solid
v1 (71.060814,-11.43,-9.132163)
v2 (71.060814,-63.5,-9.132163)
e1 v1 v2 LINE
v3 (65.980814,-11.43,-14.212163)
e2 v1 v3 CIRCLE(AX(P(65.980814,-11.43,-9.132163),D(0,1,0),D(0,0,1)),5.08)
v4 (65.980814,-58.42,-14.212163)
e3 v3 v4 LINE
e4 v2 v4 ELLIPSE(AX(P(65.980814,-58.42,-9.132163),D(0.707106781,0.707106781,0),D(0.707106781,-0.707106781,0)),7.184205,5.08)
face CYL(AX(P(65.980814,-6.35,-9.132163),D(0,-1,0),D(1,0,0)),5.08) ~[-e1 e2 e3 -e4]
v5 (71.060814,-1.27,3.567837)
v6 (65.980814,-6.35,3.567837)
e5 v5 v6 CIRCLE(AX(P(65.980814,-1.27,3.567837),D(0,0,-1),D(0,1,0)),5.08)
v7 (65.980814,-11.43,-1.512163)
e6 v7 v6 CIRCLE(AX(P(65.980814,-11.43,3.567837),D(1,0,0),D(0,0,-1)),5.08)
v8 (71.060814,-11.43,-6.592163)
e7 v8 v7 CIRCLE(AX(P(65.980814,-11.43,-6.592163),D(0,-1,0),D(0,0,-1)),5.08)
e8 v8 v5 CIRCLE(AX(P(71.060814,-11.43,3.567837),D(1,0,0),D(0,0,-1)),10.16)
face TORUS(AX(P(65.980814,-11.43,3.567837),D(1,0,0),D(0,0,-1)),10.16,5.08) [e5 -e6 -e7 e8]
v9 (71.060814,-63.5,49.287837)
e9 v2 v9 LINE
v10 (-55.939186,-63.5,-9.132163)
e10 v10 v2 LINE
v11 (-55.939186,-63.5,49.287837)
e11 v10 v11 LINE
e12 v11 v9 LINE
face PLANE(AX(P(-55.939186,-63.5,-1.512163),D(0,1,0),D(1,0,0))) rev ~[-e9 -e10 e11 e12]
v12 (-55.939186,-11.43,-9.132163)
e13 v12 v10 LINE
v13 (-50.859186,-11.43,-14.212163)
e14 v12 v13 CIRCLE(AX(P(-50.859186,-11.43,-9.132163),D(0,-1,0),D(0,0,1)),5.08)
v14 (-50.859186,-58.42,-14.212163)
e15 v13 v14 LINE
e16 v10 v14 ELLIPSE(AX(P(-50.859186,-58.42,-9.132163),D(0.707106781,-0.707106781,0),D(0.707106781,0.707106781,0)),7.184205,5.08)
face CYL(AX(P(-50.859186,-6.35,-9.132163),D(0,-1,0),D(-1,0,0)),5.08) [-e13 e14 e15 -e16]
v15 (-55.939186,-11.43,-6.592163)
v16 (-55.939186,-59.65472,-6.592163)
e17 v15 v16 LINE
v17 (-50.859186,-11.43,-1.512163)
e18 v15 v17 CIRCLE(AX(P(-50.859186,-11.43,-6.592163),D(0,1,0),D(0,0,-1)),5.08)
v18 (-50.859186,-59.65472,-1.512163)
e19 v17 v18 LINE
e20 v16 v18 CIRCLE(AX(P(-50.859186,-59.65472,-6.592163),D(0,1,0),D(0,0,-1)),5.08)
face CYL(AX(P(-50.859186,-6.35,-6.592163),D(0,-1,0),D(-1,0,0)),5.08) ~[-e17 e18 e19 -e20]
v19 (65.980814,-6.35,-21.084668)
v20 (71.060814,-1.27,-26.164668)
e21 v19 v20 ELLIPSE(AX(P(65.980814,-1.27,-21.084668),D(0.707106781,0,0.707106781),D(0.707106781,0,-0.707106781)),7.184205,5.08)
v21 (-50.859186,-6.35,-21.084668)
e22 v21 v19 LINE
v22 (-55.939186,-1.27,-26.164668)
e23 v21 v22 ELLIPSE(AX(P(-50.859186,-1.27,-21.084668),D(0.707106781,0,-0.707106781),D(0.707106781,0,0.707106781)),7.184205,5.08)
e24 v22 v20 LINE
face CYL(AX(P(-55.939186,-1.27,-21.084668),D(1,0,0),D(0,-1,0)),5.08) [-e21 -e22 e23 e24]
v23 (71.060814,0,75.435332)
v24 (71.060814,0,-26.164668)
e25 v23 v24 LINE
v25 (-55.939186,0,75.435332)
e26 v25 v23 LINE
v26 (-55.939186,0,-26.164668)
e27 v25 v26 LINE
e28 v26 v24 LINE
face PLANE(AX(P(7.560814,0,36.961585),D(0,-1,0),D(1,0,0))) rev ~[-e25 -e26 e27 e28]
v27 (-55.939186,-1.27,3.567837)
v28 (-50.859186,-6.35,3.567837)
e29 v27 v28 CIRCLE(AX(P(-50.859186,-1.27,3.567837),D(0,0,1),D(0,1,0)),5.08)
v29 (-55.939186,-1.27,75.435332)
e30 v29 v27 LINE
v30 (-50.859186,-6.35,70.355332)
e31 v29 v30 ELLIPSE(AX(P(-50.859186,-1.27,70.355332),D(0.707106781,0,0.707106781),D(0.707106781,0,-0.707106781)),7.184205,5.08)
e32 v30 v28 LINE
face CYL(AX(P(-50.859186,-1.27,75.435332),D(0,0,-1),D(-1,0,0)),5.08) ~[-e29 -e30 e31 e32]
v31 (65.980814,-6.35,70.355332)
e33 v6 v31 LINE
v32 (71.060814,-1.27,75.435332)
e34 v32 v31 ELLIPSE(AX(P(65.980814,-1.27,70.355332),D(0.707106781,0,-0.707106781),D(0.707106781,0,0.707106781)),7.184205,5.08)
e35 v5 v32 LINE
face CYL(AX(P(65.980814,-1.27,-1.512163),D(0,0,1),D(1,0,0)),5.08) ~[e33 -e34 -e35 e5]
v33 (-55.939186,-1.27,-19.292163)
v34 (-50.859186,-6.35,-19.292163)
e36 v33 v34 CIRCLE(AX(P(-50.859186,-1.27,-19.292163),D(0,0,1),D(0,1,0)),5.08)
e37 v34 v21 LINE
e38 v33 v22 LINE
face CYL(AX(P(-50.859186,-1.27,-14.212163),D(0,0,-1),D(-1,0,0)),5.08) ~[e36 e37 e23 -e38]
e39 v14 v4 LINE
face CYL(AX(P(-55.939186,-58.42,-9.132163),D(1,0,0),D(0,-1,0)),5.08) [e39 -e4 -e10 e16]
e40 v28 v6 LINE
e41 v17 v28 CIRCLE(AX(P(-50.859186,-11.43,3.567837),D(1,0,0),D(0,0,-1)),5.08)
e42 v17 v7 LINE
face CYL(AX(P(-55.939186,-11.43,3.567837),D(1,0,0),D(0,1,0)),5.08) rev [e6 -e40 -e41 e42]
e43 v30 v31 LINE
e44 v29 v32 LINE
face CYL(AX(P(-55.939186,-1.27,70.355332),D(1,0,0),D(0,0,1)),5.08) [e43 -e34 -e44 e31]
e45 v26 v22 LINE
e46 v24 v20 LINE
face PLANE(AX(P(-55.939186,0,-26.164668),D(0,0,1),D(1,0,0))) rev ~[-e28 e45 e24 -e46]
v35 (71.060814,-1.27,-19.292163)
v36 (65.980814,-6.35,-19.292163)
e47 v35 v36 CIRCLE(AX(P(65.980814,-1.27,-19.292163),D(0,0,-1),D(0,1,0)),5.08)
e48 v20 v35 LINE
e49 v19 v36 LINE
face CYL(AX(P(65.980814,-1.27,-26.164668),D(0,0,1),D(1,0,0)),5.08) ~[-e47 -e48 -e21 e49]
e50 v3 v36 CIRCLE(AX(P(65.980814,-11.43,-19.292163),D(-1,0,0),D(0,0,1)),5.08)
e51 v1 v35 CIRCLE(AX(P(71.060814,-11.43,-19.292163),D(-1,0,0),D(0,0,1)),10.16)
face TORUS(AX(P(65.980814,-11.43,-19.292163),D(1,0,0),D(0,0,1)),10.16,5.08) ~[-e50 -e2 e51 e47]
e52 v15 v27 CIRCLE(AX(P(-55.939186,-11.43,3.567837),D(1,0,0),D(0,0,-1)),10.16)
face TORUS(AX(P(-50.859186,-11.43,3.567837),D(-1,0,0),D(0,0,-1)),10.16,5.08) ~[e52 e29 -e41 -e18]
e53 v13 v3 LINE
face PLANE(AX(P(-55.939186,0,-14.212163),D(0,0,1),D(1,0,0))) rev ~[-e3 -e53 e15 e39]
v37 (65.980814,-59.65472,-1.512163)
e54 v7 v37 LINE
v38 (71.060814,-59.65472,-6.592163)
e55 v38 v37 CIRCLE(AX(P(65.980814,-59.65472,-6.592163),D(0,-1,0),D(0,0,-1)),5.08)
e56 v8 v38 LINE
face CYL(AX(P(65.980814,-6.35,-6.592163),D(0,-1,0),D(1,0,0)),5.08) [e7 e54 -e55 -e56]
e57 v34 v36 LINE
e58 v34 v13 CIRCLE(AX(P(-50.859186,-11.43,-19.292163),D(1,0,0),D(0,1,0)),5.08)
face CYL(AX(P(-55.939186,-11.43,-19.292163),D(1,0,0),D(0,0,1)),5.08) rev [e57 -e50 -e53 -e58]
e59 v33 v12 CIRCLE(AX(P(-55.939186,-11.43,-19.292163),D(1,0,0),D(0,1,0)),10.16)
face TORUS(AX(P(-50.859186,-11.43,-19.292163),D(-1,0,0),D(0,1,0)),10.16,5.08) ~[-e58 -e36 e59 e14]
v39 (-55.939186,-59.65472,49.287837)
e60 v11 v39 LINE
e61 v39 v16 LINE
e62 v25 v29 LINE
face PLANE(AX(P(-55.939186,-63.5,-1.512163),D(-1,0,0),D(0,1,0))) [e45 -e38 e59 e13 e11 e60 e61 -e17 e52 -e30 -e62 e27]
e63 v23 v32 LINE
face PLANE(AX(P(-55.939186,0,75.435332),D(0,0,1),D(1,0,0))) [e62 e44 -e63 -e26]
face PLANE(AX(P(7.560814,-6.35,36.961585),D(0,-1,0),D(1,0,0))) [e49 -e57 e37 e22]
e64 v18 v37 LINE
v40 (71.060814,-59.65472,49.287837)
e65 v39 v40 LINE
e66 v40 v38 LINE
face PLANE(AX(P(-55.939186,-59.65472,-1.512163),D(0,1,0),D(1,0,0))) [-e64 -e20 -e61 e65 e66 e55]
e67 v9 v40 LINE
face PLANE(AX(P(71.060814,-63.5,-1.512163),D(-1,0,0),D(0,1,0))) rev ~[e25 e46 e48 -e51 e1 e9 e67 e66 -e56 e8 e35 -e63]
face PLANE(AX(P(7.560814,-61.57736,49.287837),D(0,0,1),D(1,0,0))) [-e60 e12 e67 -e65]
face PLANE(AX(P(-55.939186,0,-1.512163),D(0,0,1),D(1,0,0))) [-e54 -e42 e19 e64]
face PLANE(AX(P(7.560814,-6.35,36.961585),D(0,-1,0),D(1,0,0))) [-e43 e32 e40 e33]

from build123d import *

# Parameters (mm, degrees)
F0_W     = 127
F0_H     = 12.7
F1_DEPTH = 63.5
F0_H_2   = 76.9474954844
F0_H_3   = 11.9525045156
F2_DEPTH = 6.35
F3_W     = 127
F3_H     = 3.8452798724
F4_DEPTH = 50.8
F5_R     = 5.08


with BuildPart() as f1:
    # F0 (on Front) → F1 (new body)
    with BuildSketch(Plane.XZ):
        with Locations((7.5608139634, -7.8621631652)):
            Rectangle(F0_W, F0_H)
    extrude(amount=F1_DEPTH)

    # F0 (on Front) → F2 (join)
    with BuildSketch(Plane.XZ):
        with Locations((7.5608139634, 36.961584577)):
            Rectangle(F0_W, F0_H_2)
        with Locations((7.5608139634, -20.188415423)):
            Rectangle(F0_W, F0_H_3)
        with Locations((7.5608139634, -7.8621631652)):
            Rectangle(F0_W, F0_H)
    extrude(amount=F2_DEPTH)

    # F3 (on face) → F4 (join)
    with BuildSketch(Plane.XY.offset(-1.5121631652)):
        with Locations((7.5608139634, -61.5773600638)):
            Rectangle(F3_W, F3_H)
    extrude(amount=F4_DEPTH)

    # F5
    f5_edges = [f1.edges().sort_by_distance(p)[0] for p in [
        (7.560814, -63.5, -14.212163),
        (71.060814, -34.925, -14.212163),
        (7.560814, -6.35, -26.164668),
        (-55.939186, -6.35, -20.188415),
        (-55.939186, -34.925, -14.212163),
        (71.060814, -6.35, -20.188415),
        (7.560814, -6.35, -14.212163),
        (-55.939186, -6.35, 36.961585),
        (7.560814, -6.35, -1.512163),
        (7.560814, -6.35, 75.435332),
        (71.060814, -33.00236, -1.512163),
        (71.060814, -6.35, 36.961585),
        (-55.939186, -33.00236, -1.512163),
    ]]
    fillet(f5_edges, radius=F5_R)


solid = f1.part
